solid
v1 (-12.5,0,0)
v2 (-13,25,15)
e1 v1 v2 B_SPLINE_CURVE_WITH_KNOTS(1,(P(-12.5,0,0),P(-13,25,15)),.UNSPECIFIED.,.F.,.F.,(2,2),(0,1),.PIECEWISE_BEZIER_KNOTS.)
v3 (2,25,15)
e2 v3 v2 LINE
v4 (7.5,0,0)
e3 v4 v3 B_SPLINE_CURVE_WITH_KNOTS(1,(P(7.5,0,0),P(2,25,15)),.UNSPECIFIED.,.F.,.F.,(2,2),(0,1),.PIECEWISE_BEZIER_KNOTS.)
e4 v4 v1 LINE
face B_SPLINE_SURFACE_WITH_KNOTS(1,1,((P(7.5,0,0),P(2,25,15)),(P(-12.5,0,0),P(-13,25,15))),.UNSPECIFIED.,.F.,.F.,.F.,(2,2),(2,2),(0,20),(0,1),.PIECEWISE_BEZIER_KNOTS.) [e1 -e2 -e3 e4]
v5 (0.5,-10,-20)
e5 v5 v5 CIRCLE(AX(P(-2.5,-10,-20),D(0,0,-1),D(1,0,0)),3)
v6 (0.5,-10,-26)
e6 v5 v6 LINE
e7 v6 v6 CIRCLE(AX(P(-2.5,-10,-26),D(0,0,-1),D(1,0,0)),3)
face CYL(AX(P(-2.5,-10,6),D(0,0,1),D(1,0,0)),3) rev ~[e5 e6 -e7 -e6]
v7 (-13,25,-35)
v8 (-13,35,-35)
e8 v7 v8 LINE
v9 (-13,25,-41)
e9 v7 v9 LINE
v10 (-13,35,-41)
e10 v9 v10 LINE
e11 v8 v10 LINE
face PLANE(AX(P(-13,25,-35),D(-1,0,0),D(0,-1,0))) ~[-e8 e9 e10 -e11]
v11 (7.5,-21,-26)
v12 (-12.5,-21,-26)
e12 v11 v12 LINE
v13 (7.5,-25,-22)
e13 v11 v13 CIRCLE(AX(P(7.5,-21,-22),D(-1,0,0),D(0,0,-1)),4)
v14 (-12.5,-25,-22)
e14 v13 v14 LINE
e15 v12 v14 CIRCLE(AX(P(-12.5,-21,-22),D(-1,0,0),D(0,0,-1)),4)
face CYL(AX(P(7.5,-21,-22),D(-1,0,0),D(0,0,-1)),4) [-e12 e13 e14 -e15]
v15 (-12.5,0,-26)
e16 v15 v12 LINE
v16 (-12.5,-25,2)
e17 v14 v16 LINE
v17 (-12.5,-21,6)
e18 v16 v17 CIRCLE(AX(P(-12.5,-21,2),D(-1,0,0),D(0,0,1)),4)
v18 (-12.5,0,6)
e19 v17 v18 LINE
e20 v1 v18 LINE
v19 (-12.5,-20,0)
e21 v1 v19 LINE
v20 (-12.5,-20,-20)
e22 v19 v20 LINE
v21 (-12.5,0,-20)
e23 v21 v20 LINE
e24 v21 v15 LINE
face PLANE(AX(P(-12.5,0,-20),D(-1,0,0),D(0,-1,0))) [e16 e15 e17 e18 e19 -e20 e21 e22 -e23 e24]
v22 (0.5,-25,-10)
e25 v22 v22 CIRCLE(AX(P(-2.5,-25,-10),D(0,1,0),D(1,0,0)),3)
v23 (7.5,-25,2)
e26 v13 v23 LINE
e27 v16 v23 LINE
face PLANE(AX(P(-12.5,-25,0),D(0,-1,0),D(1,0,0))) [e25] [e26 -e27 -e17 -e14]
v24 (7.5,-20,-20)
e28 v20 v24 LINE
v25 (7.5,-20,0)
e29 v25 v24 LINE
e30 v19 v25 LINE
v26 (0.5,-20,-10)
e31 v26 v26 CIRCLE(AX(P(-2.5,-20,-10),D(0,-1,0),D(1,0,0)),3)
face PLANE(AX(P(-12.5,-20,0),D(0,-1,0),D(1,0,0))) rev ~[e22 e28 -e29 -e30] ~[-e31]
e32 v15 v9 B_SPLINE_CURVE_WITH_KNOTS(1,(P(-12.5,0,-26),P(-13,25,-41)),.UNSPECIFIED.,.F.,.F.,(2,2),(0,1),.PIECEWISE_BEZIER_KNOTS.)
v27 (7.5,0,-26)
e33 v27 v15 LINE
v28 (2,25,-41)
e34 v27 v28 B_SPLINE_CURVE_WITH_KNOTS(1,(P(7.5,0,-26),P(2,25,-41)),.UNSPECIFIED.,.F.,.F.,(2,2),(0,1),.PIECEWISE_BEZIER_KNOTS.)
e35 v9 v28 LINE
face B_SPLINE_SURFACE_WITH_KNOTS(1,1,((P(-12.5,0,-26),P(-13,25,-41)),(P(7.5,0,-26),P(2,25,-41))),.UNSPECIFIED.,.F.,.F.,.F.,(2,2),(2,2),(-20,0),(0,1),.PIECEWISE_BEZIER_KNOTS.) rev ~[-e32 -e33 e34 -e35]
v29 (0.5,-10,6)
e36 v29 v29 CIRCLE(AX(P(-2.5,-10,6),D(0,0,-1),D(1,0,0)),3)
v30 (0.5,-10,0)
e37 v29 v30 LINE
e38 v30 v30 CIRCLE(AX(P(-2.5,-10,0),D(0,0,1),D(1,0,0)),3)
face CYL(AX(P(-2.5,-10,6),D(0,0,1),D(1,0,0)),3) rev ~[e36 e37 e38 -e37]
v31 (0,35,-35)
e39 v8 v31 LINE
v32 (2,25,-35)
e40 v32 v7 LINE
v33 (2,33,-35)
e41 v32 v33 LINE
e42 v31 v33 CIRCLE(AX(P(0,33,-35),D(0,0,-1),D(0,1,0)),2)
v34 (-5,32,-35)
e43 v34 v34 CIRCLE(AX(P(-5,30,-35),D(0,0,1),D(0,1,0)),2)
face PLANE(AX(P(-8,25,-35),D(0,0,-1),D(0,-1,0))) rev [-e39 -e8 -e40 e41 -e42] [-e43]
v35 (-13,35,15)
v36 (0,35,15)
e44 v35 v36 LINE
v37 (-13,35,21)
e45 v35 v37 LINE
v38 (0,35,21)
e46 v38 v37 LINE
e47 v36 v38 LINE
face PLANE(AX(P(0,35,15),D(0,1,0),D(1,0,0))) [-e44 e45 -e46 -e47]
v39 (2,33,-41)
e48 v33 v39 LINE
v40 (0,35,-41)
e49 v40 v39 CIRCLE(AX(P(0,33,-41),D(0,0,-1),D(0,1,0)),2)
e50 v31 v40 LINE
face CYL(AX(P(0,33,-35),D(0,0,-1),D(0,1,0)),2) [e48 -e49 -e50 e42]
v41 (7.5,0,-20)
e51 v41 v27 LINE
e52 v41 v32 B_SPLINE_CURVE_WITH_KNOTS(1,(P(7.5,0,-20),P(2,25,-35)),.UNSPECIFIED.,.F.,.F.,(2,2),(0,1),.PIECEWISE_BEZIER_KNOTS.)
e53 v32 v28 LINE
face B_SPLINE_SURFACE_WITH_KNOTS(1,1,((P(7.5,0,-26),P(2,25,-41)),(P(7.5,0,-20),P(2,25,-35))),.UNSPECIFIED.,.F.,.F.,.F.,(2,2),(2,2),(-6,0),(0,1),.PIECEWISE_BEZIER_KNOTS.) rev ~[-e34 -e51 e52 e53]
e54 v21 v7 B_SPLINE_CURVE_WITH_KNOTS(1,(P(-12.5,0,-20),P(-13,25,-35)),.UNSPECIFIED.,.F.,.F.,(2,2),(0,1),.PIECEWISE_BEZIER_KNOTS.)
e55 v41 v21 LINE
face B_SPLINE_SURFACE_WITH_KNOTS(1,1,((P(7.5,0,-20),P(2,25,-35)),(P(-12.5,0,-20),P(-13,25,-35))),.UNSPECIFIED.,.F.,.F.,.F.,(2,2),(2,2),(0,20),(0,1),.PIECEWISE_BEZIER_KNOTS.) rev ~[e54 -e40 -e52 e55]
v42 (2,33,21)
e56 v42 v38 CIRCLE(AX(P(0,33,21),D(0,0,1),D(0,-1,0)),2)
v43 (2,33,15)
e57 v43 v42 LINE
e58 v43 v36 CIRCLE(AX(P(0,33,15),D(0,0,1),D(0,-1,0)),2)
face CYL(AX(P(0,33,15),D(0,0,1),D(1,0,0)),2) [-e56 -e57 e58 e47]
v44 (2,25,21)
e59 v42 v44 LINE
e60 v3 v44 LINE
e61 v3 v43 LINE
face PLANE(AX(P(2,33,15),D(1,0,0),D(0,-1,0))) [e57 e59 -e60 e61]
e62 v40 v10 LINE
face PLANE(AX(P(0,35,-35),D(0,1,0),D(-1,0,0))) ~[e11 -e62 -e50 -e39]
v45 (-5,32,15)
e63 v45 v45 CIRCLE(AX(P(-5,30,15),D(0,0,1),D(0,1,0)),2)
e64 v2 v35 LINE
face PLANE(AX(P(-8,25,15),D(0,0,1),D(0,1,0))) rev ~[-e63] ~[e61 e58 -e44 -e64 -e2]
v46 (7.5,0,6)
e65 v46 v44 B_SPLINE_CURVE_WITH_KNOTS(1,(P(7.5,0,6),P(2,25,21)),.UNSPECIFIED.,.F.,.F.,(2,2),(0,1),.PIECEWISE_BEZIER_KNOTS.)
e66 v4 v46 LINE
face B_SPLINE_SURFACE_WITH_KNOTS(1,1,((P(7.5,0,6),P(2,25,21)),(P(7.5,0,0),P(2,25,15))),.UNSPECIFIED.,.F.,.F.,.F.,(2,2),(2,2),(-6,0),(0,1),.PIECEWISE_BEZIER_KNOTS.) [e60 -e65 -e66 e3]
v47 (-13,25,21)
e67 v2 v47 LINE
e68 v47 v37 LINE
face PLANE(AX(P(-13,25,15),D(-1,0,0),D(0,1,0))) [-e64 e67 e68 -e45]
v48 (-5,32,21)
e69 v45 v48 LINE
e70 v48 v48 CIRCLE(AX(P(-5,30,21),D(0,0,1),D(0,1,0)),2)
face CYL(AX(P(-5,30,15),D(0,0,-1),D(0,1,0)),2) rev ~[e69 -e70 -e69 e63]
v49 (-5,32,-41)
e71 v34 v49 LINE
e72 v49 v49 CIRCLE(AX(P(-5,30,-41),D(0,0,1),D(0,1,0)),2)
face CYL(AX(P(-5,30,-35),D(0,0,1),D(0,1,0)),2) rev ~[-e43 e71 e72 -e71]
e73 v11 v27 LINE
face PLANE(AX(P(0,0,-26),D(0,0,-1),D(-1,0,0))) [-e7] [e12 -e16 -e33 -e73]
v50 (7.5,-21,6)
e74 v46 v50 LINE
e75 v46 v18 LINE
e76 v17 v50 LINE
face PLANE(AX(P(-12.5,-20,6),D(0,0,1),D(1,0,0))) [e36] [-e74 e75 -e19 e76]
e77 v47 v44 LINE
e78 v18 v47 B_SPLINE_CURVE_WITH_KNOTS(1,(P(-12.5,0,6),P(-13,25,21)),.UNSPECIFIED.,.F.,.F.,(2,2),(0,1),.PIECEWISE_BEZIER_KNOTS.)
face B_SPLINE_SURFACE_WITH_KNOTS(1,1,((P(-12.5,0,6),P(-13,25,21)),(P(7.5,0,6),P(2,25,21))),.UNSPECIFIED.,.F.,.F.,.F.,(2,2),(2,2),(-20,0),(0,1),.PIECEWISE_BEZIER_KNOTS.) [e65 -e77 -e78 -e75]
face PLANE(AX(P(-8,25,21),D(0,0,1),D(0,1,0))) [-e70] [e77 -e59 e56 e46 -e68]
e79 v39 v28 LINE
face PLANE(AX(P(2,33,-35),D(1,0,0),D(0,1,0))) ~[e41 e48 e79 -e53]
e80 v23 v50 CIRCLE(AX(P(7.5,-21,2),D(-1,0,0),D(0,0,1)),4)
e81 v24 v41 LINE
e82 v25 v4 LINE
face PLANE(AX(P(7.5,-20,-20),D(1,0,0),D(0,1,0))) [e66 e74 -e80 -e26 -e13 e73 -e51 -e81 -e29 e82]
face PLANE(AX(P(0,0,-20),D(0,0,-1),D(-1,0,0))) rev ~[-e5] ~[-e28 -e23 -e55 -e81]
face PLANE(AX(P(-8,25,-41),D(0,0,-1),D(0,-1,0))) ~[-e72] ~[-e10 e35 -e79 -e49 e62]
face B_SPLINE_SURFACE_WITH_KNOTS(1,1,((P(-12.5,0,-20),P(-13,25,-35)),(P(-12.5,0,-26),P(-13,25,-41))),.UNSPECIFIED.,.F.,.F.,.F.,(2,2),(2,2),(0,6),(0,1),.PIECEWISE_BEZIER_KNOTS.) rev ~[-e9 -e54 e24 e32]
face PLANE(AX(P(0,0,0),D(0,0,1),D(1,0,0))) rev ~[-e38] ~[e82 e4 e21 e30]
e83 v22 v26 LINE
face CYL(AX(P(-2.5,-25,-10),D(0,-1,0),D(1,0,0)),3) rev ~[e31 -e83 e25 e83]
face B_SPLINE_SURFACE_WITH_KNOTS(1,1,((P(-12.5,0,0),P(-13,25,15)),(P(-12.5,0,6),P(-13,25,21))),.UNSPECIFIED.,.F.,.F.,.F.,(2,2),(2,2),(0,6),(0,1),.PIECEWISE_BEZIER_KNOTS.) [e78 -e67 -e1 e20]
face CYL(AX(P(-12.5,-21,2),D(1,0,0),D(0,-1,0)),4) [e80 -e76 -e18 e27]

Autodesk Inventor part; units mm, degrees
ref_plane "YZ Plane" through (0, 0, 0) normal (1, 0, 0) x (0, 1, 0)
ref_plane "XZ Plane" through (0, 0, 0) normal (0, 1, 0) x (-1, 0, 0)
ref_plane "XY Plane" through (0, 0, 0) normal (0, 0, 1) x (1, 0, 0)
sketch "Sketch1" plane through (0, 0, 0) normal (0, 0, 1) x (1, 0, 0)
  circle A0 centre (-47.5, -10) radius 3 projected
  circle A1 centre (-5, 30) radius 2 projected
  line L0 (-47.5, -10) -> (-2.5, -10)
  line L1 (7.5, 0) -> (-12.5, 0)
  line L2 (-12.5, 0) -> (-12.5, -20)
  line L3 (-12.5, -20) -> (7.5, -20)
  line L4 (7.5, -20) -> (7.5, 0)
  line L5 (7.5, 0) -> (-12.5, -20) construction
  line L6 (-12.5, 0) -> (7.5, -20) construction
  point P0 (0, 0)
  dimension "d0" = 45
  dimension "d1" = 20
  dimension "d2" = 20
extrude "Extrusion1" add sketch "Sketch1" along normal blind 6 contours L4 L3 L2 L1
ref_plane "Work Plane1" through (0, 0, -20) normal (0, 0, -1) x (-1, 0, 0)
sketch "Sketch2" plane through (0, 0, -20) normal (0, 0, -1) x (-1, 0, 0)
  line L0 (-7.5, -20) -> (-7.5, 0) projected
  line L1 (-7.5, 0) -> (12.5, 0) projected
  line L2 (12.5, 0) -> (12.5, -20) projected
  line L3 (12.5, -20) -> (-7.5, -20) projected
  point P0 (0, 0)
  dimension "d0" = 45
  dimension "d1" = 20
  dimension "d2" = 20
extrude "Extrusion2" add sketch "Sketch2" along normal blind 6
ref_plane "Work Plane2" through (-8, 25, 15) normal (0, 0, 1) x (0, 1, 0)
sketch "Sketch3" plane through (-8, 25, 15) normal (0, 0, 1) x (0, 1, 0)
  circle A0 centre (5, -3) radius 2 projected
  arc A1 (8, -10) -> (10, -8) centre (8, -8) ccw projected
  line L0 (10, -8) -> (10, -3) projected
  line L1 (10, -3) -> (10, 5) projected
  line L2 (0, 5) -> (10, 5) projected
  line L3 (0, 5) -> (0, -3) projected
  line L4 (0, -3) -> (0, -8) projected
  arc A2 (0, -8) -> (2, -10) centre (2, -8) ccw projected
  line L5 (8, -10) -> (2, -10) projected
  circle A3 centre (5, -3) radius 2 projected
  line L6 (0, 4) -> (10, 4)
  line L7 (10, 4) -> (10, -10)
  line L8 (10, -10) -> (0, -10)
  line L9 (0, -10) -> (0, 4)
  line L10 (0, 4) -> (10, -10) construction
  line L11 (10, 4) -> (0, -10) construction
  point P0 (-25, -8)
  point P1 (0, -8)
  point P2 (2, -10)
  point P3 (10, -8)
  dimension "d7" = 10
  dimension "d8" = 14
extrude "Extrusion3" add sketch "Sketch3" along normal blind 6
sketch "Sketch4" plane through (-13, 25, 15) normal (0, -1, 0) x (1, 0, 0)
  line L0 (0, 0) -> (15, 0) projected
  line L1 (15, 0) -> (15, 6) projected
  line L2 (0, 6) -> (15, 6) projected
  line L3 (0, 0) -> (0, 6) projected
  point P0 (13, -15)
sketch "Sketch5" plane through (-12.5, 0, 0) normal (0, 1, 0) x (1, 0, 0)
  line L0 (20, 0) -> (0, 0) projected
  line L1 (0, 0) -> (0, -6) projected
  line L2 (20, -6) -> (0, -6) projected
  line L3 (20, 0) -> (20, -6) projected
  point P0 (12.5, 0)
loft "Loft1" add section 1 edges at (-2.5, 0, 0) (-12.5, 0, 3) (-2.5, 0, 6) (7.5, 0, 3) section 2 edges at (-5.5, 25, 15) (2, 25, 18) (-5.5, 25, 21) (-13, 25, 18)
ref_plane "Work Plane3" through (0, 0, -10) normal (0, 0, 1) x (1, 0, 0)
mirror "Mirror1" about plane through (0, 0, -10) normal (0, 0, 1) of "Extrusion3", "Loft1"
sketch "Sketch7" plane through (-12.5, -20, 0) normal (0, -1, 0) x (1, 0, 0)
  line L0 (0, 0) -> (20, 0) projected
  line L1 (20, 0) -> (20, 6) projected
  line L2 (0, 6) -> (20, 6) projected
  line L3 (0, 0) -> (0, 6) projected
  line L4 (20, -20) -> (0, -20) projected
  line L5 (0, -20) -> (0, -26) projected
  line L6 (20, -26) -> (0, -26) projected
  line L7 (20, -20) -> (20, -26) projected
  line L8 (20, -20) -> (20, -26) projected
  line L9 (0, 6) -> (20, 6)
  line L10 (20, 6) -> (20, -26)
  line L11 (20, -26) -> (0, -26)
  line L12 (0, -26) -> (0, 6)
  point P0 (12.5, 0)
extrude "Extrusion5" add sketch "Sketch7" along normal blind 5
sketch "Sketch8" plane through (0, 0, 6) normal (0, 0, 1) x (1, 0, 0)
  line L0 (-12.5, -20) -> (7.5, -20) projected
  line L1 (-2.5, -20) -> (-2.5, -10)
  circle A0 centre (-2.5, -10) radius 3
  point P0 (0, 0)
  dimension "d23" = 10
  dimension "d24" = 6
extrude "Extrusion6" cut sketch "Sketch8" against normal blind 40
fillet "Fillet1" radius 2 2 edges at (2, 35, 18) (2, 35, -38)
fillet "Fillet2" radius 4 2 edges at (-2.5, -25, 6) (-2.5, -25, -26)
sketch "Sketch9" plane through (-12.5, -25, 0) normal (0, -1, 0) x (1, 0, 0)
  line L0 (20, -22) -> (0, -22) projected
  line L1 (20, -22) -> (20, 2) projected
  line L2 (0, 2) -> (20, 2) projected
  line L3 (0, 2) -> (0, -22) projected
  line L4 (0, 2) -> (0, -22) projected
  line L5 (0, -22) -> (20, 2)
  line L6 (0, 2) -> (20, 2) projected
  line L7 (0, 2) -> (20, -22)
  circle A0 centre (10, -10) radius 3
  point P0 (12.5, 0)
  dimension "d29" = 6
extrude "Extrusion7" cut sketch "Sketch9" against normal blind 40 contours A0 L5 L7 | L7 L5 A0 | A0 L7 L5 | L5 L7 A0
properties part number "2020_fixer2"
